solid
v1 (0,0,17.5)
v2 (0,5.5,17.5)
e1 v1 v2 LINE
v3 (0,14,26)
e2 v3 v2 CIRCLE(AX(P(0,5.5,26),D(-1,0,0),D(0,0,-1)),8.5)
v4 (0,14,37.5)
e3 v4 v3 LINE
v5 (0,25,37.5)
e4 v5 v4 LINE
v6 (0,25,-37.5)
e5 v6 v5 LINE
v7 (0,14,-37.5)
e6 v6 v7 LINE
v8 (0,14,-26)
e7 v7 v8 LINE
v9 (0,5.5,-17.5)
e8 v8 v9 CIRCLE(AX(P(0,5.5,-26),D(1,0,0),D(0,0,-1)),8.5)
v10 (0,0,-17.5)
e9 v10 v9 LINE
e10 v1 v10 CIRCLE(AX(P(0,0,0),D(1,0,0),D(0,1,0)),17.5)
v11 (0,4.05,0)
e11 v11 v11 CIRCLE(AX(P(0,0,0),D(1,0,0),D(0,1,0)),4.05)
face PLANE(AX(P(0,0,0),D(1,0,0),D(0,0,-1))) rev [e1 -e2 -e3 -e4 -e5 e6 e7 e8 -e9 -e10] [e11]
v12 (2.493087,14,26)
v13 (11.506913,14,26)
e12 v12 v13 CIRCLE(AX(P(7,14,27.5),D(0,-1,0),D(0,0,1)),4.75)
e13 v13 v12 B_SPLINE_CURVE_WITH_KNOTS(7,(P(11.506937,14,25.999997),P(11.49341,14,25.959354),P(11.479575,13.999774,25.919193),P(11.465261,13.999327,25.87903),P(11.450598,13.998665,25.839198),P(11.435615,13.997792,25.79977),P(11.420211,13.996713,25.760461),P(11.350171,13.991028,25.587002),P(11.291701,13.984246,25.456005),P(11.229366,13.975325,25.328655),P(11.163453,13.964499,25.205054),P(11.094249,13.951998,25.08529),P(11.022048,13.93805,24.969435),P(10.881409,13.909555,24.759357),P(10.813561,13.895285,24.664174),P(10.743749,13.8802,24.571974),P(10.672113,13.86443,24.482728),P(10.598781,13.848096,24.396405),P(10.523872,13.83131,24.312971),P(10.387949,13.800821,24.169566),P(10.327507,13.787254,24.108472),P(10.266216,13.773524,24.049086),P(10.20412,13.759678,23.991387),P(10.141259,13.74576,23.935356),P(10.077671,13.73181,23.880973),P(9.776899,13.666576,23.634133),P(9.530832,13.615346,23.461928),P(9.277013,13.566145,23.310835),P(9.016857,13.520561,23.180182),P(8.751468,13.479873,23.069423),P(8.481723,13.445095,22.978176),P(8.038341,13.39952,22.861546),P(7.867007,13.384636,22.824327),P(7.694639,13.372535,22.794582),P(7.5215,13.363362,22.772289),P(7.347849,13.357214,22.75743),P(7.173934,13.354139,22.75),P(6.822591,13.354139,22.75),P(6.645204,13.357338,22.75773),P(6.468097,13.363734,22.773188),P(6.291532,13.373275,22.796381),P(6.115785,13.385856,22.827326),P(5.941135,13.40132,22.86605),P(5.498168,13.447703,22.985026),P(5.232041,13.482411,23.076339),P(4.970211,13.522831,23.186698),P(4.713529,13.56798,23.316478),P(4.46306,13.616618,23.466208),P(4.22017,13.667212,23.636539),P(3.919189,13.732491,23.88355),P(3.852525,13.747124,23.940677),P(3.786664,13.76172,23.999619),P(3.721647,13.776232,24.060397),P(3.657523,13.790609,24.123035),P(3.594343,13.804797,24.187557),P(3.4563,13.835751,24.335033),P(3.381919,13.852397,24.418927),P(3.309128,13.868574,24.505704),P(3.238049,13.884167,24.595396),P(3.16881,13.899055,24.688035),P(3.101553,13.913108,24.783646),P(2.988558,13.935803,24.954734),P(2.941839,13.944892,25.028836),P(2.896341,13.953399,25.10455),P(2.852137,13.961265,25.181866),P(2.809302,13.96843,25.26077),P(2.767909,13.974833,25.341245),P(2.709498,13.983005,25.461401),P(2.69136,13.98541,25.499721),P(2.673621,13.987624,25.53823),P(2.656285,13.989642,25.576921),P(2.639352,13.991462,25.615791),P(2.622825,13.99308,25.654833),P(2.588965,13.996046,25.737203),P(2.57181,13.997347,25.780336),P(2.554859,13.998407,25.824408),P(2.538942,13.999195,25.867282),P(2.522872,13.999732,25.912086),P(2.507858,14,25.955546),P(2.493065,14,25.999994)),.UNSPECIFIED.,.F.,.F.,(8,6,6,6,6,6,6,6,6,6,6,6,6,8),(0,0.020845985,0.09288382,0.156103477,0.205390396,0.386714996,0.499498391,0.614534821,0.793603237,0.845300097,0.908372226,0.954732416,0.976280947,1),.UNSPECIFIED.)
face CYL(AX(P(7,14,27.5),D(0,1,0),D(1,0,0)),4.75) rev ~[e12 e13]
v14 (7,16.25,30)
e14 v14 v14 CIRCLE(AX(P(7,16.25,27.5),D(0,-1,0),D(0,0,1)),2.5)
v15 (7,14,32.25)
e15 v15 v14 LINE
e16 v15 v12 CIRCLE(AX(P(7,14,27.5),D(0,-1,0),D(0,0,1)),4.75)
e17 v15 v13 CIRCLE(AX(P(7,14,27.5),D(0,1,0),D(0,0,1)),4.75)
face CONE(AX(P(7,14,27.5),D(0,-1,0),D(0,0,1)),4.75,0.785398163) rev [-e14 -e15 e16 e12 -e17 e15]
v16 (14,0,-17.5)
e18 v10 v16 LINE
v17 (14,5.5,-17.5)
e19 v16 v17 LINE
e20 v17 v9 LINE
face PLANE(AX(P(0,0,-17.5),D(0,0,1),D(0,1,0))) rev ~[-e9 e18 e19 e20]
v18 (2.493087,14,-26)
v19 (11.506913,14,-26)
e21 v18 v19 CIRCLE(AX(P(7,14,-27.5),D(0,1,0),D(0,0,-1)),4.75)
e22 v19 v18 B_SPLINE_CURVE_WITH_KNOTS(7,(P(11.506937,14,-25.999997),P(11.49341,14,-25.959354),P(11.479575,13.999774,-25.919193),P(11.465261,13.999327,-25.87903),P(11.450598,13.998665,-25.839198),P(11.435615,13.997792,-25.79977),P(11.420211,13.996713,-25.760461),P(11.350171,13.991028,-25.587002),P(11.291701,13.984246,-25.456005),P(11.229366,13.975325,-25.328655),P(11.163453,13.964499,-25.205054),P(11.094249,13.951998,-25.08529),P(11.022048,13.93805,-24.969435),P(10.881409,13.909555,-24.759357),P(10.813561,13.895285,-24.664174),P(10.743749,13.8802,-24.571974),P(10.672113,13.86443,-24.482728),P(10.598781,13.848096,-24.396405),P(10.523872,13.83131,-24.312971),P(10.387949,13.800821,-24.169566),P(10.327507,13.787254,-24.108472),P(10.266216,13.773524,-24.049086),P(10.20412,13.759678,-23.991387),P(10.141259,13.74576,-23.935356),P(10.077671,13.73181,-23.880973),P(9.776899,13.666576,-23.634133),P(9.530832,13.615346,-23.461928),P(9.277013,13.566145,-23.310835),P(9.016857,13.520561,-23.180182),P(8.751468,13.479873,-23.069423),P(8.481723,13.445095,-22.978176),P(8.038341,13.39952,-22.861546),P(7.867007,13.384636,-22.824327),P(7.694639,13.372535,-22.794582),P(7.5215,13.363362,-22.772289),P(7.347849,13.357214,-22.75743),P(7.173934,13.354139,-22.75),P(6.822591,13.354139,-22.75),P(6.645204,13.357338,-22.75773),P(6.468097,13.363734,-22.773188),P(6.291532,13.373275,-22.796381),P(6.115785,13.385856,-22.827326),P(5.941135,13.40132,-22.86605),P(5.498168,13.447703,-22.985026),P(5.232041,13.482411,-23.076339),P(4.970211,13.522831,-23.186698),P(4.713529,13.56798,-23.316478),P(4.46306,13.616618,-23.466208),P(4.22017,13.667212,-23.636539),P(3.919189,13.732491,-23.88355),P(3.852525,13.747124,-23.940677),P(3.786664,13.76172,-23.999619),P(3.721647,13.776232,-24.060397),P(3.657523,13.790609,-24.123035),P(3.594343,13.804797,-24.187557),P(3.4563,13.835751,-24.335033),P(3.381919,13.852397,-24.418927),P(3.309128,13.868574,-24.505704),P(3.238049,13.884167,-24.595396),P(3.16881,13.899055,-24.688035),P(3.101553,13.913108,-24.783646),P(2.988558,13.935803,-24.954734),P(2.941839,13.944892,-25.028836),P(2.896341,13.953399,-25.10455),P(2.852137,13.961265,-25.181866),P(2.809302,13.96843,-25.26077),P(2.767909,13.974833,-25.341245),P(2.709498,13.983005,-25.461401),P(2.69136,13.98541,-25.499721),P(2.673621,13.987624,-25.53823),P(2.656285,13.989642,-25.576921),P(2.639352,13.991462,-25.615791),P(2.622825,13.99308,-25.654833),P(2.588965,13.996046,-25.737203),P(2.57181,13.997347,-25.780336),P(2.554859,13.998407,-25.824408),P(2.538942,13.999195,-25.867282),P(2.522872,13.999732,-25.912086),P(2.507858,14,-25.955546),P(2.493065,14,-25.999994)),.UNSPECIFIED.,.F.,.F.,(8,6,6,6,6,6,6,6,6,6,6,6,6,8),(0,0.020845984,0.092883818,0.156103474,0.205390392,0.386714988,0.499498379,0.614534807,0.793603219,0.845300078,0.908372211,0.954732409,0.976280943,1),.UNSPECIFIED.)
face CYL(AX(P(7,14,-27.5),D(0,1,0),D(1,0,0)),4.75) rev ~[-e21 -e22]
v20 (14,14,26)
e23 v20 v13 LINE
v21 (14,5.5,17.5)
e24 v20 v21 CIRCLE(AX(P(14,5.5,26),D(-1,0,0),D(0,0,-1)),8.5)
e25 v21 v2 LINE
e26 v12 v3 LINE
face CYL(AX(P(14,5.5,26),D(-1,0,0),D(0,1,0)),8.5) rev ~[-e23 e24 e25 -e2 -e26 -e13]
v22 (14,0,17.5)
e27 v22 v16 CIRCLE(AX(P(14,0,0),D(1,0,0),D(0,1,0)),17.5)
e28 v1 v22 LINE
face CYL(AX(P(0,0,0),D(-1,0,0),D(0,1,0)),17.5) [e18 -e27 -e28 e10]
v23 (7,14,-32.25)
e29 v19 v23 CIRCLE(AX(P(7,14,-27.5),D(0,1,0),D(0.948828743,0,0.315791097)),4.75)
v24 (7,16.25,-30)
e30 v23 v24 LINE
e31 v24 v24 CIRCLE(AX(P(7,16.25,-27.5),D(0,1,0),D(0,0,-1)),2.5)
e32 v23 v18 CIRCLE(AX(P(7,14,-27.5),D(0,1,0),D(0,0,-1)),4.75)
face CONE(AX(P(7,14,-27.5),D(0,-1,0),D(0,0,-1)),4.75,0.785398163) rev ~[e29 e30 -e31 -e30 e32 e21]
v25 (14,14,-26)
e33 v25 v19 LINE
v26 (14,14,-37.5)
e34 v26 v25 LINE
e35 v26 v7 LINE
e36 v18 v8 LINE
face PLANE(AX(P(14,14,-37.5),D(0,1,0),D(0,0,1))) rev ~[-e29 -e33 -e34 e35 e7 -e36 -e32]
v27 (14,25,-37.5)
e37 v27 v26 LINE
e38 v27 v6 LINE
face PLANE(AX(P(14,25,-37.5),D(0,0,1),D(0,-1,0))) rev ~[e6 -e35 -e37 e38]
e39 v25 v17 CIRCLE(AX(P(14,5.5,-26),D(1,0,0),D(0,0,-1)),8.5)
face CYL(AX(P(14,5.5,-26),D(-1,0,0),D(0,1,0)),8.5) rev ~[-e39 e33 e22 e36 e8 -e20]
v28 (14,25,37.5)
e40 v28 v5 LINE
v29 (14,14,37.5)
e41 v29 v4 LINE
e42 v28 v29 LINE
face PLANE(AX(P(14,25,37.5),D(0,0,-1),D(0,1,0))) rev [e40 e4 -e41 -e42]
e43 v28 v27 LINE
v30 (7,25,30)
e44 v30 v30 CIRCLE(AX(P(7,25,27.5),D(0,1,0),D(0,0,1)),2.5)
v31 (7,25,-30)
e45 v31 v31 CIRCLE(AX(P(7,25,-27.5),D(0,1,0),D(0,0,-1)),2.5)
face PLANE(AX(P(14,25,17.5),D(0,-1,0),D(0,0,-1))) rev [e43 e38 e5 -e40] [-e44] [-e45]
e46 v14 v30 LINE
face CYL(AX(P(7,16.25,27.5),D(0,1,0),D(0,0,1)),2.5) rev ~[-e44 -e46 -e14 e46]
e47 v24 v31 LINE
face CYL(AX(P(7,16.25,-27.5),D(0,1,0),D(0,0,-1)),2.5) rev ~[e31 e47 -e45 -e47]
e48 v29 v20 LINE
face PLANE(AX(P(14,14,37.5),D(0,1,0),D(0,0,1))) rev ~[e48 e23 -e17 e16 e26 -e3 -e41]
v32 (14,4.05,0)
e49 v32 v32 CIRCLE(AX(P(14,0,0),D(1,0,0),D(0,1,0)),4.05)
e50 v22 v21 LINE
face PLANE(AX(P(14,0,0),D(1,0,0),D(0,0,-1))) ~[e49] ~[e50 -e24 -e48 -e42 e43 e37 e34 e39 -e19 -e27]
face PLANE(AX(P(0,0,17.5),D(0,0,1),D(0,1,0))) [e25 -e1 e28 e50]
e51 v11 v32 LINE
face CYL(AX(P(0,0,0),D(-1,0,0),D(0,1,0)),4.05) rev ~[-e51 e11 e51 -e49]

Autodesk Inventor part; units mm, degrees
ref_plane "YZ Plane" through (0, 0, 0) normal (1, 0, 0) x (0, 1, 0)
ref_plane "XZ Plane" through (0, 0, 0) normal (0, 1, 0) x (-1, 0, 0)
ref_plane "XY Plane" through (0, 0, 0) normal (0, 0, 1) x (1, 0, 0)
sketch "Sketch1" plane through (0, 0, 0) normal (1, 0, 0) x (0, 1, 0)
  circle A0 centre (0, 0) radius 4.05
  circle A1 centre (0, 0) radius 17.5
  line L0 (0, 17.5) -> (25, 17.5)
  line L1 (0, -17.5) -> (25, -17.5)
  line L2 (25, -17.5) -> (25, 17.5)
  dimension "d0" = 8.1
  dimension "d1" = 35
  dimension "d2" = 25
  dimension "d3" = 25
extrude "Extrusion1" add sketch "Sketch1" along normal blind 14
ref_plane "Work Plane1" through (0, 0, 0) normal (0, 0, -1) x (-1, 0, 0)
sketch "Sketch2" plane through (14, 0, 0) normal (1, 0, 0) x (0, 0, -1)
  line L0 (17.5, 25) -> (-17.5, 25) projected
  line L1 (17.5, 25) -> (37.5, 25)
  line L2 (37.5, 25) -> (37.5, 14)
  line L3 (37.5, 14) -> (17.5, 14)
  line L4 (17.5, 14) -> (17.5, 25)
  point P0 (0, 0)
  dimension "d6" = 20
  dimension "d7" = 11
extrude "Extrusion2" add sketch "Sketch2" against normal blind 14
fillet "Fillet1" radius 8.5 1 edges at (7, 14, -17.5)
sketch "Sketch3" plane through (0, 14, -37.5) normal (0, -1, 0) x (1, 0, 0)
  line L0 (14, 0) -> (0, 0) construction
  line L1 (7, 0) -> (7, 10) construction
  point P0 (0, 37.5)
  dimension "d11" = 10
hole "Hole1" at (7, 14, -27.5) direction (0, 1, 0) diameter 5 end through all countersink diameter 9.5 countersink angle 90
sketch "Sketch4" plane through (0, 14, -37.5) normal (0, -1, 0) x (1, 0, 0)
  arc A0 (2.4931, 11.5) -> (11.5069, 11.5) centre (7, 10) ccw projected
  circle A1 centre (7, 10) radius 4.75
  point P0 (0, 37.5)
  point P1 (11.5069, 11.5)
extrude "Extrusion3" cut sketch "Sketch4" along normal blind 14
mirror "Mirror1" about plane through (0, 0, 0) normal (0, 0, -1) of "Hole1", "Extrusion3", "Extrusion2", "Fillet1"
properties part number "Passive Wheel 8mm bore bracket"
